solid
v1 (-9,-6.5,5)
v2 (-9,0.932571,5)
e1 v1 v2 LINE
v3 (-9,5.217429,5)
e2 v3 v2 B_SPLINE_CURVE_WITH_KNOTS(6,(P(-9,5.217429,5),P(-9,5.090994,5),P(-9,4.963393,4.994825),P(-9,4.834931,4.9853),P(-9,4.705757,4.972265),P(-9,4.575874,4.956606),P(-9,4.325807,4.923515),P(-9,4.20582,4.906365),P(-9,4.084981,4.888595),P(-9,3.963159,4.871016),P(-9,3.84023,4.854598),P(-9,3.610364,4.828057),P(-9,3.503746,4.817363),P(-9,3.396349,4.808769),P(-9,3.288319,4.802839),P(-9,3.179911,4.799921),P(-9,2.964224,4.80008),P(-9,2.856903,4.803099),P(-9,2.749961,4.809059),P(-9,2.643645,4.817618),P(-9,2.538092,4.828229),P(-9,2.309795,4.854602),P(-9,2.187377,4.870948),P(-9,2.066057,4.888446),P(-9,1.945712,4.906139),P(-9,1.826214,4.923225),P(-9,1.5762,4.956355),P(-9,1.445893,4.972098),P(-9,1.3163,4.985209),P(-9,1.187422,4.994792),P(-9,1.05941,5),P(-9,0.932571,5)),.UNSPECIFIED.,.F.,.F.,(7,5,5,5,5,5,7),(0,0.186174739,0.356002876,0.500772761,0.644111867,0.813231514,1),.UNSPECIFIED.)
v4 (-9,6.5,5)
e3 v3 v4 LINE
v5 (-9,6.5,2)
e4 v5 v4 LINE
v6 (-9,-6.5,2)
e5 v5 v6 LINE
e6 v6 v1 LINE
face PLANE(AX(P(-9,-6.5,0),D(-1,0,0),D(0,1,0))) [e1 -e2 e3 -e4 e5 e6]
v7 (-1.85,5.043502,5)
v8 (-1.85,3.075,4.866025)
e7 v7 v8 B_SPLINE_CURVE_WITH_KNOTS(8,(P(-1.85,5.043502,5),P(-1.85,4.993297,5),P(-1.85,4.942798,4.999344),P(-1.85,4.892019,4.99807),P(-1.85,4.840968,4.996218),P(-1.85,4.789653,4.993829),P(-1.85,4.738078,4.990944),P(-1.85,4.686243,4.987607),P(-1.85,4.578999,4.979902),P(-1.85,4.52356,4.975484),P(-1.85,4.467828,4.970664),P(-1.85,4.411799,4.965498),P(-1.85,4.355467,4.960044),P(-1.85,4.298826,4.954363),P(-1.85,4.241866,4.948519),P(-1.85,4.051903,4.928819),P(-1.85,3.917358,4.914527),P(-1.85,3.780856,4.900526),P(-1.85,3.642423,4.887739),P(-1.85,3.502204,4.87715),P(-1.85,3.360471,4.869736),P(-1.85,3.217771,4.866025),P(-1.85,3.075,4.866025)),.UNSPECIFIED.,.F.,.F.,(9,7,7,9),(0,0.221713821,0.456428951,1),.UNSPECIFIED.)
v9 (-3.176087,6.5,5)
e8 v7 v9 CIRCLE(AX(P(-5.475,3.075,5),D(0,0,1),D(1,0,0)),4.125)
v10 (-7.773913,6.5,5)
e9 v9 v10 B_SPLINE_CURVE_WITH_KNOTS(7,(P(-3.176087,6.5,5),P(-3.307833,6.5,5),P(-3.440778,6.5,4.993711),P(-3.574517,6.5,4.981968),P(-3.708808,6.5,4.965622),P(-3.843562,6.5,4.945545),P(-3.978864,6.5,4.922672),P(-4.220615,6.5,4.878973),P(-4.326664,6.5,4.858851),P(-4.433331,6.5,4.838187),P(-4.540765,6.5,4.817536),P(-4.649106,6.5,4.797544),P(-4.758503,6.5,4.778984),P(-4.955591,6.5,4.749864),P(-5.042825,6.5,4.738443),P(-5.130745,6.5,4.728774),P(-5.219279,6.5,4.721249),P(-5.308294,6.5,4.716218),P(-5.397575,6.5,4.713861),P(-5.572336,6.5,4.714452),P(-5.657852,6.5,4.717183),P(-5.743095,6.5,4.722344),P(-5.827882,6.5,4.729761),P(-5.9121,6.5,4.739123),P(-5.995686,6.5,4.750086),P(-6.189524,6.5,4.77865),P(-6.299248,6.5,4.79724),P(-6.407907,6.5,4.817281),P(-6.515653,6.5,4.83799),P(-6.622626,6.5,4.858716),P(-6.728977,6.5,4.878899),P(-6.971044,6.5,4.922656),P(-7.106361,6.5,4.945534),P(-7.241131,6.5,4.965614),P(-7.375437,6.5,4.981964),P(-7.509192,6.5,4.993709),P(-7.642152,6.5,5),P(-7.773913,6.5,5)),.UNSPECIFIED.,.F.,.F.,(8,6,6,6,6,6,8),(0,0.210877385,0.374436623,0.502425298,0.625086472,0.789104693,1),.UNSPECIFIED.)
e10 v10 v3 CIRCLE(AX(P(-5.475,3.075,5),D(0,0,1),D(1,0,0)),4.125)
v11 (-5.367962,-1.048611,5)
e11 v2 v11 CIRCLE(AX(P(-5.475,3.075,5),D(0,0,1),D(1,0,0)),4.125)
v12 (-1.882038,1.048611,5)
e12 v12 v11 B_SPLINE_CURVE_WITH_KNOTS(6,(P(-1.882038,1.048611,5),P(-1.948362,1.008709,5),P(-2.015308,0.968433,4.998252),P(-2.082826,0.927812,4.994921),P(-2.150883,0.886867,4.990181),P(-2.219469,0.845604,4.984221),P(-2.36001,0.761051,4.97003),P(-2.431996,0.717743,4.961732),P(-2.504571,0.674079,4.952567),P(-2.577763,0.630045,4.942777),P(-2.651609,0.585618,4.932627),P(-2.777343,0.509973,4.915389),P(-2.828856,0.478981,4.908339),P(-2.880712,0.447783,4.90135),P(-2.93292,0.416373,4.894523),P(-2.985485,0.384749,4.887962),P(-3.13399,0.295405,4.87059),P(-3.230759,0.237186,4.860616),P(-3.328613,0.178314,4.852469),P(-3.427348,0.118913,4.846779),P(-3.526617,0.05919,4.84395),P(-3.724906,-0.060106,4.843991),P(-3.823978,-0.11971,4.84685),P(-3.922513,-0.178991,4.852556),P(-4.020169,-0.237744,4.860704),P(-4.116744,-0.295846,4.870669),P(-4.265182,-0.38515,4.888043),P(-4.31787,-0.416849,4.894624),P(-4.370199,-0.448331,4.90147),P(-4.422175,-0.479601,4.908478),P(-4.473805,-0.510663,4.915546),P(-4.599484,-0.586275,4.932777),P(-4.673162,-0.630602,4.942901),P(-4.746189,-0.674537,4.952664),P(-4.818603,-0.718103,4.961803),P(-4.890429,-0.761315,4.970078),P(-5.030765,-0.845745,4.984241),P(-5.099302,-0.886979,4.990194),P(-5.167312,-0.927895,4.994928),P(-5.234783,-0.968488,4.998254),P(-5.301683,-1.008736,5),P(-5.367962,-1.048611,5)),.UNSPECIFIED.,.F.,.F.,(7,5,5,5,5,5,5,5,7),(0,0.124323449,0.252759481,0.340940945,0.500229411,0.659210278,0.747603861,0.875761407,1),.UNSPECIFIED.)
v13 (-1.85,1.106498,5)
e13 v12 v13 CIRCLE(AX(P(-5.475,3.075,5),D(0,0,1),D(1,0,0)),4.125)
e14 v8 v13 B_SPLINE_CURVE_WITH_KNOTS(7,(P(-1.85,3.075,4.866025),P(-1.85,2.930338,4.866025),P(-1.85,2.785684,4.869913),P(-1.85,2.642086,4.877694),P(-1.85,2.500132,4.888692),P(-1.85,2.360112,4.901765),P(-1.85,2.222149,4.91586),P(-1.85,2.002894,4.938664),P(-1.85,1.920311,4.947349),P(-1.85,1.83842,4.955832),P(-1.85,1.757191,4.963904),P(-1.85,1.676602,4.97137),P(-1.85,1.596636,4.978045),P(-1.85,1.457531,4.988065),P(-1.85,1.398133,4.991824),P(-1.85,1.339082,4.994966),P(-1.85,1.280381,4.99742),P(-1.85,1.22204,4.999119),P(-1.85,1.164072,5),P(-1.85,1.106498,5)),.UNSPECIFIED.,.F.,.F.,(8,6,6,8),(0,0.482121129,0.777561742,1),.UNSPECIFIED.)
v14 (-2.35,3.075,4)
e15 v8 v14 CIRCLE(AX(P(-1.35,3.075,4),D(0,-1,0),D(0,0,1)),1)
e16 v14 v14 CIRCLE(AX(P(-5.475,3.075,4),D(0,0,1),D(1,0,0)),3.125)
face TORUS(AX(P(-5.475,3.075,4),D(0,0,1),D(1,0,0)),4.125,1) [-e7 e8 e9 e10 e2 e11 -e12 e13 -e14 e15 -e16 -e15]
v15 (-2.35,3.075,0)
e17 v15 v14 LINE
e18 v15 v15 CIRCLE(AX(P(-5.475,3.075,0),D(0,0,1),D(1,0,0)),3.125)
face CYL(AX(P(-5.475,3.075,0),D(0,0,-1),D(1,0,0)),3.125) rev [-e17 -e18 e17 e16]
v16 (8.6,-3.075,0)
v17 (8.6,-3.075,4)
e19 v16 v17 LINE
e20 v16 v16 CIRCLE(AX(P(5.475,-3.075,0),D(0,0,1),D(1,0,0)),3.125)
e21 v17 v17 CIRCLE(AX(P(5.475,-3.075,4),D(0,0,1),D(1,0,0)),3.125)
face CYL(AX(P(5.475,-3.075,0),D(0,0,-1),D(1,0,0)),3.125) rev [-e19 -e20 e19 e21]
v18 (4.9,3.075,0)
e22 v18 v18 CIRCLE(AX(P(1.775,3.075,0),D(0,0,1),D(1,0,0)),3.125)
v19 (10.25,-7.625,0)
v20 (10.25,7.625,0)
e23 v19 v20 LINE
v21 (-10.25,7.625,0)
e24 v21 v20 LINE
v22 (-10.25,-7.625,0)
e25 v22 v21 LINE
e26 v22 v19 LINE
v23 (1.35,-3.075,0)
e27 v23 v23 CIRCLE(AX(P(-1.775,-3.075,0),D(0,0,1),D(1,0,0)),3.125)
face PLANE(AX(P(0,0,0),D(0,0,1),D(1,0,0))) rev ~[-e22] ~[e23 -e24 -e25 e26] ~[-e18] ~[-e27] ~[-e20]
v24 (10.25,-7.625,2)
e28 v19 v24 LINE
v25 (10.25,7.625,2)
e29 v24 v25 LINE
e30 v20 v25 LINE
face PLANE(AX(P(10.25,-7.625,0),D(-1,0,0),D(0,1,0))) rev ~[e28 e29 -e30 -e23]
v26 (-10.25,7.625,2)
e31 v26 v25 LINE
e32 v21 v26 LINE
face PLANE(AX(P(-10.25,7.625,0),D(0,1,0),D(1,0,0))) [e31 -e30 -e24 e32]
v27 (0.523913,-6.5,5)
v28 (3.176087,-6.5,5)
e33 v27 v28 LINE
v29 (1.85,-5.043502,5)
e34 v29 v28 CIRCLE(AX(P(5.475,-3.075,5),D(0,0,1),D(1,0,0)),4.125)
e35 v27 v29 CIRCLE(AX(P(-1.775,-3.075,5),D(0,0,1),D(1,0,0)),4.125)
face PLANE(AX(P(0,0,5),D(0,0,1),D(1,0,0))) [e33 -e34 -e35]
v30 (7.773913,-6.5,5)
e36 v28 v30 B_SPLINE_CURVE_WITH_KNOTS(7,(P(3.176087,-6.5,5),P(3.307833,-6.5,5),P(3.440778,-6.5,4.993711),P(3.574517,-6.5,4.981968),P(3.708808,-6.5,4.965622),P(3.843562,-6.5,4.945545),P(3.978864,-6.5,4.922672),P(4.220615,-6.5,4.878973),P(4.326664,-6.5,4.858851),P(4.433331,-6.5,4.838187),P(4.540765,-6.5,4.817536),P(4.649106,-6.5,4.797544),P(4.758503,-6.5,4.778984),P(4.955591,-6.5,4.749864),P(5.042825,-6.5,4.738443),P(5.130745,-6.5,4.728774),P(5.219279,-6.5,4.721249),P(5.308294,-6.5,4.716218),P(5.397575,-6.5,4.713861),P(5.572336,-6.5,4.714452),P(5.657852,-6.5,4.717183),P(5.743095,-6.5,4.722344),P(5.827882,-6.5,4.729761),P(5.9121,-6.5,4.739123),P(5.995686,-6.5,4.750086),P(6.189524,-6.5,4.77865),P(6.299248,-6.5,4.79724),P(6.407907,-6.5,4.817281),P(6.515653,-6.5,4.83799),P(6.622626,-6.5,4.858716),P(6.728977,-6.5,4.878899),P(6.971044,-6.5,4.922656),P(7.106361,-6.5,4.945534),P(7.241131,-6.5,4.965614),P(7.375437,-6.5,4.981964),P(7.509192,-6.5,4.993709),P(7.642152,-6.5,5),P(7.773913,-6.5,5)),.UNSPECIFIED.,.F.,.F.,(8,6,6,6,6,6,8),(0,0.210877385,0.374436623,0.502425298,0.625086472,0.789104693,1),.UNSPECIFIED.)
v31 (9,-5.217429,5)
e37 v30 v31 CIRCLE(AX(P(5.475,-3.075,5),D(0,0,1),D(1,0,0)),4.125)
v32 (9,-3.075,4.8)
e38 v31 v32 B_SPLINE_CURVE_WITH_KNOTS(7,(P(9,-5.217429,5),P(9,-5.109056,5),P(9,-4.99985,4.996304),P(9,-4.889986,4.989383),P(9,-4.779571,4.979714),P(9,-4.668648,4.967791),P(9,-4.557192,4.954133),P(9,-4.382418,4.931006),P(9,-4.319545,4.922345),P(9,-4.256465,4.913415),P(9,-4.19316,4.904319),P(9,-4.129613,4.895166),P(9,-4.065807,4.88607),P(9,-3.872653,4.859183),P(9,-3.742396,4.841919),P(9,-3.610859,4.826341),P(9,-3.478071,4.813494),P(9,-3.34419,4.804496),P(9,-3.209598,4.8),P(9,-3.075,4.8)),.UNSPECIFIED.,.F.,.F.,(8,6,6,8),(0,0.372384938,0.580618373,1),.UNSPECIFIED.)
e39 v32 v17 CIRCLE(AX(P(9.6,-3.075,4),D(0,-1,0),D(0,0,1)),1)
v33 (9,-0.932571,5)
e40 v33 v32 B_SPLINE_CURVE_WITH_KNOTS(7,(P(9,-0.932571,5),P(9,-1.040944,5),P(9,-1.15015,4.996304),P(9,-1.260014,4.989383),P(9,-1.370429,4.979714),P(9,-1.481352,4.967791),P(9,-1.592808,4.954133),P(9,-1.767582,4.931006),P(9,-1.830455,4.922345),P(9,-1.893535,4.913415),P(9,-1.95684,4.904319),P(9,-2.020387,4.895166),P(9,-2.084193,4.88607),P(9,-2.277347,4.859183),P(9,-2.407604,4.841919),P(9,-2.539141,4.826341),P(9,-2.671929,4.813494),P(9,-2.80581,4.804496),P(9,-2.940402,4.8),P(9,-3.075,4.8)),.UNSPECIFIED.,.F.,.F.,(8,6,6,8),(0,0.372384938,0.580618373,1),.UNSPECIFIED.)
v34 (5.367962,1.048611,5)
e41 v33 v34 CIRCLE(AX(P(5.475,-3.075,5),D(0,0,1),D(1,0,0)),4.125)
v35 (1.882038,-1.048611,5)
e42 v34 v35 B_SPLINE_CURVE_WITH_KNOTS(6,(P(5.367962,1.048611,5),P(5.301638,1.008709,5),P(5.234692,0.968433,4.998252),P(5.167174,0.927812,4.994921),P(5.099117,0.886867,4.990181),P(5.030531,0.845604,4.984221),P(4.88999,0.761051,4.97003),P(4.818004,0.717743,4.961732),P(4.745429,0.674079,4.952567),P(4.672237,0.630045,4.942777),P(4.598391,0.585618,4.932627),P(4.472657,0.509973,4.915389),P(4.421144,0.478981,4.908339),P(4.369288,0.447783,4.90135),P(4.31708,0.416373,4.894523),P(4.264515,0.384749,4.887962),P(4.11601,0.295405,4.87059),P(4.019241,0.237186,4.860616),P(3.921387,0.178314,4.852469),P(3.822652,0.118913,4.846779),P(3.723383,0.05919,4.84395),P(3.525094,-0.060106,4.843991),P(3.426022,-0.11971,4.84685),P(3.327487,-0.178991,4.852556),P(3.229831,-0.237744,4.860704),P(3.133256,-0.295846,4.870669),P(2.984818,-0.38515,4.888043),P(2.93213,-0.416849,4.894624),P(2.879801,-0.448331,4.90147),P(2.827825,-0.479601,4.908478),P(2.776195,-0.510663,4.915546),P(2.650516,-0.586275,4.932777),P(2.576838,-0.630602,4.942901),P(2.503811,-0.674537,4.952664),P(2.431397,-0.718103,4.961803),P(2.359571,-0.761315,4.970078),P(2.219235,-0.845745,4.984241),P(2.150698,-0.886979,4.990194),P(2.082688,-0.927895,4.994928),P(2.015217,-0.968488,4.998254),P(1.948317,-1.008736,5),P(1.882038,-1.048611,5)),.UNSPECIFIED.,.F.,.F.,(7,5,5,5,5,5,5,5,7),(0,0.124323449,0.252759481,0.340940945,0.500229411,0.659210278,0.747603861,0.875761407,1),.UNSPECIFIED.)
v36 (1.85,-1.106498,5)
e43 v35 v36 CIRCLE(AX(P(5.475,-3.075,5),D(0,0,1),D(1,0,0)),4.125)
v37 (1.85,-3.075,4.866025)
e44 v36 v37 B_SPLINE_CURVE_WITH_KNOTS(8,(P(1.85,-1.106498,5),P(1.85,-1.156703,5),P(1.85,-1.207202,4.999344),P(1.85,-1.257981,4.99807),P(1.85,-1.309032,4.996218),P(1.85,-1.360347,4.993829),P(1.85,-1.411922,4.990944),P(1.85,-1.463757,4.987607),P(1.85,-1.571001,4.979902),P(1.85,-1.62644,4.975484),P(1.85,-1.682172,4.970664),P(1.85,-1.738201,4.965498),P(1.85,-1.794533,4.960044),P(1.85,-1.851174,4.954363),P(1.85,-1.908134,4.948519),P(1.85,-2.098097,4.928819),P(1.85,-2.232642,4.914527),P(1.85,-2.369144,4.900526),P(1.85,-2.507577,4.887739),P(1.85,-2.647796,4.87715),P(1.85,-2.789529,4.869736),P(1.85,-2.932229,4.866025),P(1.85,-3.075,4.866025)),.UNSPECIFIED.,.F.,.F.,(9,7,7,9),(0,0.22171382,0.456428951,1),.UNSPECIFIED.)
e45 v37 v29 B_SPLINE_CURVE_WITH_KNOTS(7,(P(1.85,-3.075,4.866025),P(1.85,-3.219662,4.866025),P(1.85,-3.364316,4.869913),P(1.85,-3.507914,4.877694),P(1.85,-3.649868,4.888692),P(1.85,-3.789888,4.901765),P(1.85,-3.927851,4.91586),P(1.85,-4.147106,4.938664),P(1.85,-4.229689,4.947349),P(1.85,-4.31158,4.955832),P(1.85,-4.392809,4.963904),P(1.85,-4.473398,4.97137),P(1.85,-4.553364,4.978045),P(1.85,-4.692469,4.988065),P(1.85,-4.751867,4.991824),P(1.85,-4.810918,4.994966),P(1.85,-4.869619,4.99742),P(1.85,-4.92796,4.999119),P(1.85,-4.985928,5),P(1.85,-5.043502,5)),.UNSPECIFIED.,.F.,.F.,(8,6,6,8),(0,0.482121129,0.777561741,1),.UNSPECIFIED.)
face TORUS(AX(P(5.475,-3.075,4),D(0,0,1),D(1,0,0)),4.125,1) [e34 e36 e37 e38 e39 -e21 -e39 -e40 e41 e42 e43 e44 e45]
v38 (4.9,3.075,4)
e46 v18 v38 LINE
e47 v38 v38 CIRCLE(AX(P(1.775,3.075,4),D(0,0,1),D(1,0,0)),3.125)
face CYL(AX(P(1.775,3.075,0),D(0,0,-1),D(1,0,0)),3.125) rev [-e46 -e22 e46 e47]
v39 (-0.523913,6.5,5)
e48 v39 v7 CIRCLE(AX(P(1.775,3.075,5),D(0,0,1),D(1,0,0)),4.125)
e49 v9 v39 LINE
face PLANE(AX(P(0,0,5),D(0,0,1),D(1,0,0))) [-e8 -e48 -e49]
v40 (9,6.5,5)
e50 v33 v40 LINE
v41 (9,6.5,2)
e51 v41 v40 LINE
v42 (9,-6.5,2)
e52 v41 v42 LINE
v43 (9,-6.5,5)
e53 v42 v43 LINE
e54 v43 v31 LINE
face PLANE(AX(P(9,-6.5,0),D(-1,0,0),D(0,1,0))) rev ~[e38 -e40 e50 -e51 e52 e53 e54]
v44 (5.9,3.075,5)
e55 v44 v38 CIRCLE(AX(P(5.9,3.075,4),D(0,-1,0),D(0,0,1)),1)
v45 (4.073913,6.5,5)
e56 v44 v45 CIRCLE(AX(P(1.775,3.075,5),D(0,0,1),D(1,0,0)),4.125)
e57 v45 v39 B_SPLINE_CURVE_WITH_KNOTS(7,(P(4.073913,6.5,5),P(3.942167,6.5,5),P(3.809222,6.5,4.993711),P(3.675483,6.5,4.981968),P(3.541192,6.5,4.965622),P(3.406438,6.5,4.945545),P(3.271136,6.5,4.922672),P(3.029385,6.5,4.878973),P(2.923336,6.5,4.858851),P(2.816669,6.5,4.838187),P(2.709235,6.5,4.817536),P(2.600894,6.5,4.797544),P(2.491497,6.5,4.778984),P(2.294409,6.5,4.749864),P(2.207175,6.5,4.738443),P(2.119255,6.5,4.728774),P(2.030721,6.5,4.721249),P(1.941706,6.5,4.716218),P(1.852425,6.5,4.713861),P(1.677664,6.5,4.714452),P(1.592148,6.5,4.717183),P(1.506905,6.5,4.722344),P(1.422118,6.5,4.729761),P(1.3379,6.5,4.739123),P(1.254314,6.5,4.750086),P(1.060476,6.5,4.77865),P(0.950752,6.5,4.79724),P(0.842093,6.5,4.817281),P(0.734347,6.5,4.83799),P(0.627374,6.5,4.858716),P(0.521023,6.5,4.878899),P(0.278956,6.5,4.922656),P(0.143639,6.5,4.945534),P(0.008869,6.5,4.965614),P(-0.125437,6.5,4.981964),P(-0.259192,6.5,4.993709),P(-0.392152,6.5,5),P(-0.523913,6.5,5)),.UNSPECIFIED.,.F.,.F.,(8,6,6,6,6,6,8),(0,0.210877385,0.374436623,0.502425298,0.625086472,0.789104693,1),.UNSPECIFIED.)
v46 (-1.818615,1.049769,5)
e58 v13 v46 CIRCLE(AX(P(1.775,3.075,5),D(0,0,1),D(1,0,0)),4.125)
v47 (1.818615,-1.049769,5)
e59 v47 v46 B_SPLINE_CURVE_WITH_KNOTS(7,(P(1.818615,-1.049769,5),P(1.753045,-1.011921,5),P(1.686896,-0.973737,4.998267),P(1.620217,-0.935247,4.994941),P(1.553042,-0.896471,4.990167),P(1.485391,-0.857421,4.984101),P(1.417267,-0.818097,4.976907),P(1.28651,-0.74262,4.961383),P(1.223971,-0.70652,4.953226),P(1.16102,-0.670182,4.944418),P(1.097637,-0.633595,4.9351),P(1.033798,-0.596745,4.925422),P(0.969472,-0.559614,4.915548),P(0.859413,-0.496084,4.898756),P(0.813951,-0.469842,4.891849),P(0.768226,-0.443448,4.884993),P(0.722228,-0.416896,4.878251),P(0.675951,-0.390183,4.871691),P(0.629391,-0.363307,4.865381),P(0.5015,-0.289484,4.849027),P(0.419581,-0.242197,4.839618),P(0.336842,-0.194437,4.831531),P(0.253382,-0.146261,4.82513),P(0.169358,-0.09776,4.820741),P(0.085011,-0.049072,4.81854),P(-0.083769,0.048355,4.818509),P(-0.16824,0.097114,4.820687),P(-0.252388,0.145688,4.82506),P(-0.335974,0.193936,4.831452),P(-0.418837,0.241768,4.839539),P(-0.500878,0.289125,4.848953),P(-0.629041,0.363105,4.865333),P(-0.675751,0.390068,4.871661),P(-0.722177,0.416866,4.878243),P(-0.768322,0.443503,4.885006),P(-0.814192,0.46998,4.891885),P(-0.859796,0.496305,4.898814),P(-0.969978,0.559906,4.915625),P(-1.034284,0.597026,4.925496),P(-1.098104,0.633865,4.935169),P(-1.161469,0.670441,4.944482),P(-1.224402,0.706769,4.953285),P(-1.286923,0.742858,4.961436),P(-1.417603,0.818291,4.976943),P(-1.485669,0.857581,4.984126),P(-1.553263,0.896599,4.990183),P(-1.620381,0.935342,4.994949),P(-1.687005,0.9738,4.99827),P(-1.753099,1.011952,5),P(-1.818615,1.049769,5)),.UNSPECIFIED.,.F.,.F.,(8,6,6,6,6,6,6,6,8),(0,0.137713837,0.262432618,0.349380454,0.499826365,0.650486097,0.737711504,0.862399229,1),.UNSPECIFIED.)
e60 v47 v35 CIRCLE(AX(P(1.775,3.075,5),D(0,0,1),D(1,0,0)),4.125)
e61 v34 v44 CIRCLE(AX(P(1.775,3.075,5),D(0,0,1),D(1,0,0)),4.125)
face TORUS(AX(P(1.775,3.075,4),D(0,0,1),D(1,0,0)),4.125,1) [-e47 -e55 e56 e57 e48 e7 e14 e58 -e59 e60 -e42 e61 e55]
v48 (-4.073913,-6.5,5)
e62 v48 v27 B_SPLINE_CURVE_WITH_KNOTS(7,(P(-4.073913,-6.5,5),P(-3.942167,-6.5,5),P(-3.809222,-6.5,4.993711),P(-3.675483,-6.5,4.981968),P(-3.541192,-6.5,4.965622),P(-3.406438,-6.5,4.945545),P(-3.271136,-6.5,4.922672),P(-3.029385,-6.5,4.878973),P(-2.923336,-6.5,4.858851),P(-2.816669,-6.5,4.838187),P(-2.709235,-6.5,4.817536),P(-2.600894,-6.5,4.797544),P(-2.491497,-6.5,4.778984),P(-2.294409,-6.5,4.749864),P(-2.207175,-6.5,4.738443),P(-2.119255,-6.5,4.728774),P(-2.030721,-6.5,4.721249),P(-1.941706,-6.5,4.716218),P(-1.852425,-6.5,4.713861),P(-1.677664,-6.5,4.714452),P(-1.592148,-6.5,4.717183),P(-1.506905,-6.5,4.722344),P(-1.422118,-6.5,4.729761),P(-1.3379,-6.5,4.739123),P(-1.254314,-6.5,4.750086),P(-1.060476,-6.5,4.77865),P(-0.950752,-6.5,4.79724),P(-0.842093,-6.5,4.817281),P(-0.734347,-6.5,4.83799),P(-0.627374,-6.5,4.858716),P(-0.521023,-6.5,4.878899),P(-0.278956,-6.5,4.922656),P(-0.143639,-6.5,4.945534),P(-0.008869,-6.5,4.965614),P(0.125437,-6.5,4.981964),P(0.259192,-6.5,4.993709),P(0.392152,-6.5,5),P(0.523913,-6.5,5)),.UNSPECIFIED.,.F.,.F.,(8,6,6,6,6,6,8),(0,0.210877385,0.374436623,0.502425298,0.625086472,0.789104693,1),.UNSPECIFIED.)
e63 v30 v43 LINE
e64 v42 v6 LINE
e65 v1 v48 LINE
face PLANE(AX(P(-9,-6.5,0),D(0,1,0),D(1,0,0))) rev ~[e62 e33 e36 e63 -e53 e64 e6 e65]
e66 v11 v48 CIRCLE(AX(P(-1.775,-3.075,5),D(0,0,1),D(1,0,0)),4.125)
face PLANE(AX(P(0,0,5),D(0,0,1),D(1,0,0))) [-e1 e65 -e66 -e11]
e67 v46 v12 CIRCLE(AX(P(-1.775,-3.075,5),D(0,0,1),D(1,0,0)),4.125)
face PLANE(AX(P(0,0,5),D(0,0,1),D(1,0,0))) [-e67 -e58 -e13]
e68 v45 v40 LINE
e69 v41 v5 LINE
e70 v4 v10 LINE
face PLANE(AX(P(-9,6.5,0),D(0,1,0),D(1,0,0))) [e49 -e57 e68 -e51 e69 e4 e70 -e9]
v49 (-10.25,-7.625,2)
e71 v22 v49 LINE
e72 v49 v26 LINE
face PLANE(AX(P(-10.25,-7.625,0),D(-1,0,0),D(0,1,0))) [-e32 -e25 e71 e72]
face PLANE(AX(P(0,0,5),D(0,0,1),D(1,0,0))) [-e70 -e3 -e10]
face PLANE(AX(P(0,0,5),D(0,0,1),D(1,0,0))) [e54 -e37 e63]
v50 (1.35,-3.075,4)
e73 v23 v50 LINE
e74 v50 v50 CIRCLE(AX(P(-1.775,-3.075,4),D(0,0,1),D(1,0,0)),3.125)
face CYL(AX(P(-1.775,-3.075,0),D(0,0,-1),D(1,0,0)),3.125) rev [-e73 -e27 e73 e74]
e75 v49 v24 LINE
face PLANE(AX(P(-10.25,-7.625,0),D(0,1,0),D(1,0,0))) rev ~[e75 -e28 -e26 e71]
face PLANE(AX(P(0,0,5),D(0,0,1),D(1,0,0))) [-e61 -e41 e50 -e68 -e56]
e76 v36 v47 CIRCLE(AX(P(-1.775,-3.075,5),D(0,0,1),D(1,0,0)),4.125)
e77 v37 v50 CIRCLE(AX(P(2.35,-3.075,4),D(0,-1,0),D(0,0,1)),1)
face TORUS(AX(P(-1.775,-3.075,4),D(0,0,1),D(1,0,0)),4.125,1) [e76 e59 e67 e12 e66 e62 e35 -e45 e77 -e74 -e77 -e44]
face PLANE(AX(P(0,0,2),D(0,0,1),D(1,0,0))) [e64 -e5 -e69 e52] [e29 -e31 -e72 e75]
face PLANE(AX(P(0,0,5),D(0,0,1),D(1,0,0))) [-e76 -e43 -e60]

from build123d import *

# Parameters (mm, degrees)
F0_W     = 20.5
F0_H     = 15.25
F0_W_2   = 18
F0_H_2   = 13
F0_R     = 3.125
F1_DEPTH = 2
F2_DEPTH = 5


# Not quite as in the source:
# - a fillet or chamfer that OpenCascade refuses, or shapes differently, is made with other operations: its cross-section is extruded or revolved along the edge and cut away or added


with BuildPart() as f1:
    # F0 (on Top) → F1 (new body)
    with BuildSketch(Plane.XY):
        Rectangle(F0_W, F0_H)
        Rectangle(F0_W_2, F0_H_2, mode=Mode.SUBTRACT)
        Rectangle(F0_W_2, F0_H_2)
        with Locations((-1.775, -3.075)):
            Circle(F0_R, mode=Mode.SUBTRACT)
        with Locations((5.475, -3.075)):
            Circle(F0_R, mode=Mode.SUBTRACT)
        with Locations((-5.475, 3.075)):
            Circle(F0_R, mode=Mode.SUBTRACT)
        with Locations((1.775, 3.075)):
            Circle(F0_R, mode=Mode.SUBTRACT)
    extrude(amount=F1_DEPTH)

    # F0 (on Top) → F2 (join)
    with BuildSketch(Plane.XY):
        Rectangle(F0_W_2, F0_H_2)
        with Locations((-1.775, -3.075)):
            Circle(F0_R, mode=Mode.SUBTRACT)
        with Locations((5.475, -3.075)):
            Circle(F0_R, mode=Mode.SUBTRACT)
        with Locations((-5.475, 3.075)):
            Circle(F0_R, mode=Mode.SUBTRACT)
        with Locations((1.775, 3.075)):
            Circle(F0_R, mode=Mode.SUBTRACT)
    extrude(amount=F2_DEPTH)

    # F3: fillet of radius 1 on 4 edges, made by hand

    # F3_s1 → F3_t2 (revolve, cut)
    with BuildSketch(Plane.XZ.offset(-3.075)):
        with BuildLine():
            ThreePointArc((-1.35, 5), (-2.0571067812, 4.7071067812), (-2.35, 4))
            Line((-2.35, 4), (-2.35, 5))
            Line((-2.35, 5), (-1.35, 5))
        make_face()
    revolve(axis=Axis((-5.475, 3.075, 5), (0, 0, 1)), mode=Mode.SUBTRACT)

    # F3_s3 → F3_t4 (revolve, cut)
    with BuildSketch(Plane.XZ.offset(-3.075)):
        with BuildLine():
            ThreePointArc((5.9, 5), (5.1928932188, 4.7071067812), (4.9, 4))
            Line((4.9, 4), (4.9, 5))
            Line((4.9, 5), (5.9, 5))
        make_face()
    revolve(axis=Axis((1.775, 3.075, 5), (0, 0, 1)), mode=Mode.SUBTRACT)

    # F3_s5 → F3_t6 (revolve, cut)
    with BuildSketch(Plane.XZ.offset(3.075)):
        with BuildLine():
            ThreePointArc((2.35, 5), (1.6428932188, 4.7071067812), (1.35, 4))
            Line((1.35, 4), (1.35, 5))
            Line((1.35, 5), (2.35, 5))
        make_face()
    revolve(axis=Axis((-1.775, -3.075, 5), (0, 0, 1)), mode=Mode.SUBTRACT)

    # F3_s7 → F3_t8 (revolve, cut)
    with BuildSketch(Plane.XZ.offset(3.075)):
        with BuildLine():
            ThreePointArc((9.6, 5), (8.8928932188, 4.7071067812), (8.6, 4))
            Line((8.6, 4), (8.6, 5))
            Line((8.6, 5), (9.6, 5))
        make_face()
    revolve(axis=Axis((5.475, -3.075, 5), (0, 0, 1)), mode=Mode.SUBTRACT)


solid = f1.part
